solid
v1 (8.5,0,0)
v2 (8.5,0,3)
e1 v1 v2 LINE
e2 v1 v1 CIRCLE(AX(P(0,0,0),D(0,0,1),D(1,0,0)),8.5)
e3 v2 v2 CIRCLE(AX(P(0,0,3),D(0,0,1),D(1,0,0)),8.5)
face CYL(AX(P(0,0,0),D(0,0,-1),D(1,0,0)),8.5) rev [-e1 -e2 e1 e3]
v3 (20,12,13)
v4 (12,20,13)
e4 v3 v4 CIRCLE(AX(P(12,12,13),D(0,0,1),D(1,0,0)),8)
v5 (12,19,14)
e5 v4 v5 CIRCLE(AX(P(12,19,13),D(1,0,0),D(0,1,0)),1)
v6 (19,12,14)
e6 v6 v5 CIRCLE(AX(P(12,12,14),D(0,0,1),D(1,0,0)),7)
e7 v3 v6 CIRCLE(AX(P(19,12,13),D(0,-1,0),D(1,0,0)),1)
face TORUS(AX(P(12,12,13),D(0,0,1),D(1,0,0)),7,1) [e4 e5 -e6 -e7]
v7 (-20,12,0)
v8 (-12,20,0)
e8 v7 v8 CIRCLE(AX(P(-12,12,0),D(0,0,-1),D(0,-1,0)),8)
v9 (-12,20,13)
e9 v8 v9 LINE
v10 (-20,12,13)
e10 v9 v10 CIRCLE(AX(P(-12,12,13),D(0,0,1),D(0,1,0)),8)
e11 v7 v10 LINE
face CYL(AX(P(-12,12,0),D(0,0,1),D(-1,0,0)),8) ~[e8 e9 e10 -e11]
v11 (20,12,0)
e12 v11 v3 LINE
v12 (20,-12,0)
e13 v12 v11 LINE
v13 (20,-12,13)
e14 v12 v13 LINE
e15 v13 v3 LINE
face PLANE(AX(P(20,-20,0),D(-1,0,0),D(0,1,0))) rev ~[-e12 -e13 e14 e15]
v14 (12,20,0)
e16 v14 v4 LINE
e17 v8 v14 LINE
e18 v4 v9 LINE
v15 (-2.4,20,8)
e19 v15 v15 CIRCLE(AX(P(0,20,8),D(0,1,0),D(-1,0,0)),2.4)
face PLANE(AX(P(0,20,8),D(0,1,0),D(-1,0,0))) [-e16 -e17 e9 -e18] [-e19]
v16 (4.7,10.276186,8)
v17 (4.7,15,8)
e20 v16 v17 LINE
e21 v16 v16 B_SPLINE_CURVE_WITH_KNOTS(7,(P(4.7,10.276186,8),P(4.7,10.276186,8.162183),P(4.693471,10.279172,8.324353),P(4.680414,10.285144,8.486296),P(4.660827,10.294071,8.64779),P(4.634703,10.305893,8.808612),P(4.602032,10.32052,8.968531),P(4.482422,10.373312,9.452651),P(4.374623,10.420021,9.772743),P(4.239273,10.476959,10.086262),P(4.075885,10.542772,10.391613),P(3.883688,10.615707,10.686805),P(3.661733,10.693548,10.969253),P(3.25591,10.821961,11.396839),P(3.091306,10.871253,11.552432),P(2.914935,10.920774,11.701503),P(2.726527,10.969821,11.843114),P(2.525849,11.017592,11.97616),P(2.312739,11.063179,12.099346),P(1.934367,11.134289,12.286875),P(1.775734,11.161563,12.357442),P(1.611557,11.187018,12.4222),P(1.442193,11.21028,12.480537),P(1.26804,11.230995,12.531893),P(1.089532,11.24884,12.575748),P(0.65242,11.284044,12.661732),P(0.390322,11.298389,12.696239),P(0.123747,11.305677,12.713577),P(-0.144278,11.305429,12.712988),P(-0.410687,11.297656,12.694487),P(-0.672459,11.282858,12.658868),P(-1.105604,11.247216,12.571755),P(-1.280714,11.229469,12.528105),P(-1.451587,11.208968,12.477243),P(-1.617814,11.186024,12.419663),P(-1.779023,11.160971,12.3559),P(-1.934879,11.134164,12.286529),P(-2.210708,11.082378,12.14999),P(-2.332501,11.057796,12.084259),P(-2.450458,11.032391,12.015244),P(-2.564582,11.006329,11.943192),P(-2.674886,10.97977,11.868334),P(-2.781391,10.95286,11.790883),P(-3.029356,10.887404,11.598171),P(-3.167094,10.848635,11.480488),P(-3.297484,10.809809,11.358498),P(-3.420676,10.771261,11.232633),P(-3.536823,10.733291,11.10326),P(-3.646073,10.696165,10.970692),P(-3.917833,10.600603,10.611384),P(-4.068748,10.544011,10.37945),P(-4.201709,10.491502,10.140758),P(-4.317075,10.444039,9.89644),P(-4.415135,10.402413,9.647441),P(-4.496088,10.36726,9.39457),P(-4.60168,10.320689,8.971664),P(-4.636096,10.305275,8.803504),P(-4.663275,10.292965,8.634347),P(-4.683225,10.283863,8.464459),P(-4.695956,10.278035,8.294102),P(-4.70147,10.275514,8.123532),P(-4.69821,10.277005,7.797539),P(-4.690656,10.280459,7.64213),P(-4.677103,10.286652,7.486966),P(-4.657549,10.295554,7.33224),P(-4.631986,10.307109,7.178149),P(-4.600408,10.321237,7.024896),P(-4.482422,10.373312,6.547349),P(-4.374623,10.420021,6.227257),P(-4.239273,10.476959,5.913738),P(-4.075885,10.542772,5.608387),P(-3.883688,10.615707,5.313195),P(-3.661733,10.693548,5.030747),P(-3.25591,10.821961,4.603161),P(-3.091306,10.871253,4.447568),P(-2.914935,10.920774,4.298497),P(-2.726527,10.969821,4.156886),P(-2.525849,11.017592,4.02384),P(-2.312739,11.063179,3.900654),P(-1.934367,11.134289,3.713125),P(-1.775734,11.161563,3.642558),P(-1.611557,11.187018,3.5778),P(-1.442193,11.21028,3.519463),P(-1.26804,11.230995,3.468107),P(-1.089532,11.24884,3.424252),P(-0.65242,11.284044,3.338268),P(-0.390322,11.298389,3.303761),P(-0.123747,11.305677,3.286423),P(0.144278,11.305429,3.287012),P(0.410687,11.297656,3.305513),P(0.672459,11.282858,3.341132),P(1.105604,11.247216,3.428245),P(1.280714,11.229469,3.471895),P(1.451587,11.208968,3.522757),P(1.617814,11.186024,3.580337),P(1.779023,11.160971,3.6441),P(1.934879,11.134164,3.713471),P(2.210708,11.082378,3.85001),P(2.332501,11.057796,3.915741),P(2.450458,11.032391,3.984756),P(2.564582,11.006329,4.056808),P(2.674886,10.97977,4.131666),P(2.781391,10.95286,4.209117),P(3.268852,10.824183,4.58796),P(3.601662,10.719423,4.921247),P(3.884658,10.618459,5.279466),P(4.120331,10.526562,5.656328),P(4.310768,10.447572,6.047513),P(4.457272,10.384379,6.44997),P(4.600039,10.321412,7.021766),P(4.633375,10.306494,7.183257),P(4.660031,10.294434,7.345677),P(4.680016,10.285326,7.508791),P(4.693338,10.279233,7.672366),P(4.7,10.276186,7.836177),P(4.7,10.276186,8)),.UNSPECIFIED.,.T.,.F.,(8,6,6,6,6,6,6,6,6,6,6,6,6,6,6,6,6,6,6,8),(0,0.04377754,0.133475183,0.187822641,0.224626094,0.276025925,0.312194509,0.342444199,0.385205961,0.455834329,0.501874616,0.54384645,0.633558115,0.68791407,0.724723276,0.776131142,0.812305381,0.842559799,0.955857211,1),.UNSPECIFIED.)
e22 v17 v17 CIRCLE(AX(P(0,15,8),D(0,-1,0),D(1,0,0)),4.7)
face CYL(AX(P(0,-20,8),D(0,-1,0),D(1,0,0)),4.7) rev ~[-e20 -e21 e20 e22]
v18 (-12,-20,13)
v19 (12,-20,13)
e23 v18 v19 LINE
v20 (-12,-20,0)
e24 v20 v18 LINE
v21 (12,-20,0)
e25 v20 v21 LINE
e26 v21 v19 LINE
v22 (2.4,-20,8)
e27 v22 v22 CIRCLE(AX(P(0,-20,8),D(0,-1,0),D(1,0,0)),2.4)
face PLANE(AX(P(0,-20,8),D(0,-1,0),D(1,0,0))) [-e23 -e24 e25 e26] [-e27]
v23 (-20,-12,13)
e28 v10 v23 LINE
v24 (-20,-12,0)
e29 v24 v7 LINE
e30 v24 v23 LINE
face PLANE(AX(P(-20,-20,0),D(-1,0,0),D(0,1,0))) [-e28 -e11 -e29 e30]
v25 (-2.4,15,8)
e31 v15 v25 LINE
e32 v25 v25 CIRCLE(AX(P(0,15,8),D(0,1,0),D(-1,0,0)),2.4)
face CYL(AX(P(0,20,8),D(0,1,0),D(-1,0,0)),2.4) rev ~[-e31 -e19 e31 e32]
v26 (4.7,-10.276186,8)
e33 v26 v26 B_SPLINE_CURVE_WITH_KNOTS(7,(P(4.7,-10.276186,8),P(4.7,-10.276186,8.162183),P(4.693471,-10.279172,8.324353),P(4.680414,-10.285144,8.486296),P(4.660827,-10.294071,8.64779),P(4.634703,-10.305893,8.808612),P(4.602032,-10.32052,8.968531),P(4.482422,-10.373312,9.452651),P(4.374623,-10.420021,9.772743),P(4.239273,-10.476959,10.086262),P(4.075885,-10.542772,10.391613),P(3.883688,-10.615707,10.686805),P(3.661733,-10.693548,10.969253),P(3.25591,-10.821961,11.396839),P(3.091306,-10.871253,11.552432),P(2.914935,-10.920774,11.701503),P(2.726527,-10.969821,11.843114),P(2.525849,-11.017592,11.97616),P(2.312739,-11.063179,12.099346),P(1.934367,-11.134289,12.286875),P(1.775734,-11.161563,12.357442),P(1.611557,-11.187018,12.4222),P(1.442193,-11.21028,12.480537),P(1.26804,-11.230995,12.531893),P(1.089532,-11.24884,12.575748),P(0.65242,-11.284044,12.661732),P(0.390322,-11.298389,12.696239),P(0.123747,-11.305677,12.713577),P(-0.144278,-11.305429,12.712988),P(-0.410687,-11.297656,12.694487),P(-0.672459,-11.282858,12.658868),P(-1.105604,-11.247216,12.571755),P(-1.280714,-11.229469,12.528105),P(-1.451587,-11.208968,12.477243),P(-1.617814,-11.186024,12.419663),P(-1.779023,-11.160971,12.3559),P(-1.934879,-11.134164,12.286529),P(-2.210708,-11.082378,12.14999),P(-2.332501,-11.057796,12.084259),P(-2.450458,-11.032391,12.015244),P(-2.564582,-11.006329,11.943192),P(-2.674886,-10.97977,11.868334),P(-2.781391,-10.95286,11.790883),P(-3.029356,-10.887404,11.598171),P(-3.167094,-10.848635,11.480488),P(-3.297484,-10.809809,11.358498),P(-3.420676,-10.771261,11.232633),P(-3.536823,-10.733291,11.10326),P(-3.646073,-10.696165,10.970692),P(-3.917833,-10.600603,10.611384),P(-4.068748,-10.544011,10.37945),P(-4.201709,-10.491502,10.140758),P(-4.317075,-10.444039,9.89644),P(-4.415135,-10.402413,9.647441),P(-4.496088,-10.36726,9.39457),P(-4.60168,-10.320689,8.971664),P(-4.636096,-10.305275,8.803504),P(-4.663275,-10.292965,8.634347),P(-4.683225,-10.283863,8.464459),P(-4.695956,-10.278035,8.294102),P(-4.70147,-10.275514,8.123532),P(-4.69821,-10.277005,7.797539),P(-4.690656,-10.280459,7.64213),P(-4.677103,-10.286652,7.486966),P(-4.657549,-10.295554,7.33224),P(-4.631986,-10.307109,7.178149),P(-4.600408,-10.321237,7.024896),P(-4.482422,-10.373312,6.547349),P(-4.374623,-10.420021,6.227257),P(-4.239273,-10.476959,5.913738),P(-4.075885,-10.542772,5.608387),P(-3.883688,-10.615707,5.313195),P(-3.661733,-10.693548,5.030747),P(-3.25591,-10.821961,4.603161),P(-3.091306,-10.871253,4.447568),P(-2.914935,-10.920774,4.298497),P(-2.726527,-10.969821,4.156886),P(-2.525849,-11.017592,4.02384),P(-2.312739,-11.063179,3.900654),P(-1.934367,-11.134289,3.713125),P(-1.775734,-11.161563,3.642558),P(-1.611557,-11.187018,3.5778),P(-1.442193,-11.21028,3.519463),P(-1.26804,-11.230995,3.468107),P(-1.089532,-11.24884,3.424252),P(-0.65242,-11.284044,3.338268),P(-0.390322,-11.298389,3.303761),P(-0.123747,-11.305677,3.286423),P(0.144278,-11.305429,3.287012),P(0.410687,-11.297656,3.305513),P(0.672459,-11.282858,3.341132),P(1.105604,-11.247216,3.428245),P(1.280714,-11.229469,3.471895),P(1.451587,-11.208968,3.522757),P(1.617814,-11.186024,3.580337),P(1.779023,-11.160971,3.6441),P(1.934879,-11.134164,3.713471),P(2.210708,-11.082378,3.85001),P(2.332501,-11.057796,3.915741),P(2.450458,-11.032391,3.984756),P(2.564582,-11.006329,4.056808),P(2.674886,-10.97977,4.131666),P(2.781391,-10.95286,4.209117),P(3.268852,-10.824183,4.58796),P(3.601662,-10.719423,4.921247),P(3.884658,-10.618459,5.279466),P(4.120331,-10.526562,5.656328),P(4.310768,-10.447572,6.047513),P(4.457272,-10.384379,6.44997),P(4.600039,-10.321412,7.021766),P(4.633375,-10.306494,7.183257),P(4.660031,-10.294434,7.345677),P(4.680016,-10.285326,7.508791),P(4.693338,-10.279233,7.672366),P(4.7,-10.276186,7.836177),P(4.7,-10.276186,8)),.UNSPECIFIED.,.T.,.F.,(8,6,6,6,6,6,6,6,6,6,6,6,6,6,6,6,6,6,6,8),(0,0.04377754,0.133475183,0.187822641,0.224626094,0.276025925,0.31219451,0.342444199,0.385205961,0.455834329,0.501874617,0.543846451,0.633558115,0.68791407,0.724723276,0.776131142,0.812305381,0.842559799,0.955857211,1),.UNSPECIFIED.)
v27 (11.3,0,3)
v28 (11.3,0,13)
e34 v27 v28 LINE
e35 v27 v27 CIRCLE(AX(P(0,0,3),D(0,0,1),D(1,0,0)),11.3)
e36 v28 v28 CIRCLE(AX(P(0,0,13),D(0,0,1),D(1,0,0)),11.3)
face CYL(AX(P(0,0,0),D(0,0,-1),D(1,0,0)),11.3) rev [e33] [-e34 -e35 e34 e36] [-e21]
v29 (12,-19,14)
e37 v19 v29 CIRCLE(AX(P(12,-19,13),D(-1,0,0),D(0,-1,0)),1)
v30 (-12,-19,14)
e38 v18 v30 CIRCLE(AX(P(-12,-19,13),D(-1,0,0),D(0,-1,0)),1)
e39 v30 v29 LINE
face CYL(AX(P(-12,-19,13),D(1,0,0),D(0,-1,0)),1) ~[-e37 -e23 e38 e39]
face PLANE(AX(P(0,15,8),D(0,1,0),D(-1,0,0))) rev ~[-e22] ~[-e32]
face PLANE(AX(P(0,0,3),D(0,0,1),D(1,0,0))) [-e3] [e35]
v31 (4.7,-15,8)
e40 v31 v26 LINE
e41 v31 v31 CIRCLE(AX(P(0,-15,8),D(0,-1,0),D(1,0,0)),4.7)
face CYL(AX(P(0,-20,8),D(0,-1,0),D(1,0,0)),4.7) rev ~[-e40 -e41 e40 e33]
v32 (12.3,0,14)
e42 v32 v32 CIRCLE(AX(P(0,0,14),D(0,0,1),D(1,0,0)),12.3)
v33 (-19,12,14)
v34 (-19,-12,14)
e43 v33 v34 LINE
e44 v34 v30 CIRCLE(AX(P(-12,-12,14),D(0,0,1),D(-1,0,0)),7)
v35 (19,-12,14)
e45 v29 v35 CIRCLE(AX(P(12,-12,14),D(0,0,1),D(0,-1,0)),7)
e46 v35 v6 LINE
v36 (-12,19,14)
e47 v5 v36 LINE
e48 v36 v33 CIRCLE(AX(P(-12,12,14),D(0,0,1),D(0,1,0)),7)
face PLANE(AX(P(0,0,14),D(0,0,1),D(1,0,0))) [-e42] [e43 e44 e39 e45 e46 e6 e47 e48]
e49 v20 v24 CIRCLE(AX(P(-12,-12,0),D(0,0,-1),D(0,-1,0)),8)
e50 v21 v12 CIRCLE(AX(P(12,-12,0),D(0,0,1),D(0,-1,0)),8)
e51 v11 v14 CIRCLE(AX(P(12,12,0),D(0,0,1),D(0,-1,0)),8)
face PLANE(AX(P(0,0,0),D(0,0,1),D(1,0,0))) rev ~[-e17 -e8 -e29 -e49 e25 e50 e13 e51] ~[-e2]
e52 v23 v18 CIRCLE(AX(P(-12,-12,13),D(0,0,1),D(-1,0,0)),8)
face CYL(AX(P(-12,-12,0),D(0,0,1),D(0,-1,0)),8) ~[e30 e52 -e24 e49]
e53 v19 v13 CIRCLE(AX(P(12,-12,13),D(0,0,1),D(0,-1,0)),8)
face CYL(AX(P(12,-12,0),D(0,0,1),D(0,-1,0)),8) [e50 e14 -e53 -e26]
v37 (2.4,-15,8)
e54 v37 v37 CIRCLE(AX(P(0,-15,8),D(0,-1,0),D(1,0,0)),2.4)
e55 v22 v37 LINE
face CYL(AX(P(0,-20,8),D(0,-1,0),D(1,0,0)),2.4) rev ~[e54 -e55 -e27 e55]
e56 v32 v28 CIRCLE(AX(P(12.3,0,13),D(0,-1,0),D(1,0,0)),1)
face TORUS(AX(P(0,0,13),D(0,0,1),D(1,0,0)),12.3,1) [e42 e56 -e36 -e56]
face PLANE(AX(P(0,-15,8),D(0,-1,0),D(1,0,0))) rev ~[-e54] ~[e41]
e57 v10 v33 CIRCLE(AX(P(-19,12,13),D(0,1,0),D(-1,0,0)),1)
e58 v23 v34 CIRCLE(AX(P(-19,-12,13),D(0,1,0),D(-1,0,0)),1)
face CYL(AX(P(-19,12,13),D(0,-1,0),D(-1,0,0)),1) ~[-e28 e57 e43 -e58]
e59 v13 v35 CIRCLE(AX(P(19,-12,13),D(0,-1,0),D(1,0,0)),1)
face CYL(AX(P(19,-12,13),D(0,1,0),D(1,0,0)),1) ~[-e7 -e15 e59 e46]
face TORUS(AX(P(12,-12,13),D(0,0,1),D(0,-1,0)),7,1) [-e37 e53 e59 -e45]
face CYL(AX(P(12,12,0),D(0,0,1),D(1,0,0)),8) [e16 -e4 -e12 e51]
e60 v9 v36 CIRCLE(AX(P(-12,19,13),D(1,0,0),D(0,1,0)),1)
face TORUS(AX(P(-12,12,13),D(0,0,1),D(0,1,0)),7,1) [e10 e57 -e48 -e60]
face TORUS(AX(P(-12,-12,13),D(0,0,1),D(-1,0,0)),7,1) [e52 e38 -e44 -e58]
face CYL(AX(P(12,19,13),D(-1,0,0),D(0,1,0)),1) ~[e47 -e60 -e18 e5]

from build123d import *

# Parameters (mm, degrees)
F0_R     = 11.3
F0_R_2   = 8.5
F1_DEPTH = 3
F0_W     = 40
F0_H     = 40
F2_DEPTH = 14
F3_R     = 4.7
F4_DEPTH = 40.001
F5_R     = 4.7
F5_R_2   = 2.4
F6_DEPTH = 5
F7_R     = 4.7
F7_R_2   = 2.4
F8_DEPTH = 5
F9_R     = 8
F10_R    = 1


with BuildPart() as f1:
    # F0 (on Top) → F1 (new body)
    with BuildSketch(Plane.XY):
        Circle(F0_R)
        Circle(F0_R_2, mode=Mode.SUBTRACT)
    extrude(amount=F1_DEPTH)

    # F0 (on Top) → F2 (join)
    with BuildSketch(Plane.XY):
        Rectangle(F0_W, F0_H)
        Circle(F0_R, mode=Mode.SUBTRACT)
    extrude(amount=F2_DEPTH)

    # F3 (on face) → F4 (cut, through all)
    with BuildSketch(Plane.XZ.offset(20)):
        with Locations((0, 8)):
            Circle(F3_R)
    extrude(amount=-F4_DEPTH, mode=Mode.SUBTRACT)

    # F5 (on face) → F6 (join)
    with BuildSketch(Plane.XZ.offset(20)):
        with Locations((0, 8)):
            Circle(F5_R)
        with Locations((0, 8)):
            Circle(F5_R_2, mode=Mode.SUBTRACT)
    extrude(amount=-F6_DEPTH)

    # F7 (on face) → F8 (join)
    with BuildSketch(Plane(origin=(0, 20, 0), x_dir=(-1, 0, 0), z_dir=(0, 1, 0))):
        with Locations((0, 8)):
            Circle(F7_R)
        with Locations((0, 8)):
            Circle(F7_R_2, mode=Mode.SUBTRACT)
    extrude(amount=-F8_DEPTH)

    # F9
    f9_edges = [f1.edges().sort_by_distance(p)[0] for p in [
        (-20, -20, 7),
        (-20, 20, 7),
        (20, -20, 7),
        (20, 20, 7),
    ]]
    fillet(f9_edges, radius=F9_R)

    # F10
    f10_edges = [f1.edges().sort_by_distance(p)[0] for p in [
        (0, -20, 14),
        (-11.3, 0, 14),
    ]]
    fillet(f10_edges, radius=F10_R)


solid = f1.part
